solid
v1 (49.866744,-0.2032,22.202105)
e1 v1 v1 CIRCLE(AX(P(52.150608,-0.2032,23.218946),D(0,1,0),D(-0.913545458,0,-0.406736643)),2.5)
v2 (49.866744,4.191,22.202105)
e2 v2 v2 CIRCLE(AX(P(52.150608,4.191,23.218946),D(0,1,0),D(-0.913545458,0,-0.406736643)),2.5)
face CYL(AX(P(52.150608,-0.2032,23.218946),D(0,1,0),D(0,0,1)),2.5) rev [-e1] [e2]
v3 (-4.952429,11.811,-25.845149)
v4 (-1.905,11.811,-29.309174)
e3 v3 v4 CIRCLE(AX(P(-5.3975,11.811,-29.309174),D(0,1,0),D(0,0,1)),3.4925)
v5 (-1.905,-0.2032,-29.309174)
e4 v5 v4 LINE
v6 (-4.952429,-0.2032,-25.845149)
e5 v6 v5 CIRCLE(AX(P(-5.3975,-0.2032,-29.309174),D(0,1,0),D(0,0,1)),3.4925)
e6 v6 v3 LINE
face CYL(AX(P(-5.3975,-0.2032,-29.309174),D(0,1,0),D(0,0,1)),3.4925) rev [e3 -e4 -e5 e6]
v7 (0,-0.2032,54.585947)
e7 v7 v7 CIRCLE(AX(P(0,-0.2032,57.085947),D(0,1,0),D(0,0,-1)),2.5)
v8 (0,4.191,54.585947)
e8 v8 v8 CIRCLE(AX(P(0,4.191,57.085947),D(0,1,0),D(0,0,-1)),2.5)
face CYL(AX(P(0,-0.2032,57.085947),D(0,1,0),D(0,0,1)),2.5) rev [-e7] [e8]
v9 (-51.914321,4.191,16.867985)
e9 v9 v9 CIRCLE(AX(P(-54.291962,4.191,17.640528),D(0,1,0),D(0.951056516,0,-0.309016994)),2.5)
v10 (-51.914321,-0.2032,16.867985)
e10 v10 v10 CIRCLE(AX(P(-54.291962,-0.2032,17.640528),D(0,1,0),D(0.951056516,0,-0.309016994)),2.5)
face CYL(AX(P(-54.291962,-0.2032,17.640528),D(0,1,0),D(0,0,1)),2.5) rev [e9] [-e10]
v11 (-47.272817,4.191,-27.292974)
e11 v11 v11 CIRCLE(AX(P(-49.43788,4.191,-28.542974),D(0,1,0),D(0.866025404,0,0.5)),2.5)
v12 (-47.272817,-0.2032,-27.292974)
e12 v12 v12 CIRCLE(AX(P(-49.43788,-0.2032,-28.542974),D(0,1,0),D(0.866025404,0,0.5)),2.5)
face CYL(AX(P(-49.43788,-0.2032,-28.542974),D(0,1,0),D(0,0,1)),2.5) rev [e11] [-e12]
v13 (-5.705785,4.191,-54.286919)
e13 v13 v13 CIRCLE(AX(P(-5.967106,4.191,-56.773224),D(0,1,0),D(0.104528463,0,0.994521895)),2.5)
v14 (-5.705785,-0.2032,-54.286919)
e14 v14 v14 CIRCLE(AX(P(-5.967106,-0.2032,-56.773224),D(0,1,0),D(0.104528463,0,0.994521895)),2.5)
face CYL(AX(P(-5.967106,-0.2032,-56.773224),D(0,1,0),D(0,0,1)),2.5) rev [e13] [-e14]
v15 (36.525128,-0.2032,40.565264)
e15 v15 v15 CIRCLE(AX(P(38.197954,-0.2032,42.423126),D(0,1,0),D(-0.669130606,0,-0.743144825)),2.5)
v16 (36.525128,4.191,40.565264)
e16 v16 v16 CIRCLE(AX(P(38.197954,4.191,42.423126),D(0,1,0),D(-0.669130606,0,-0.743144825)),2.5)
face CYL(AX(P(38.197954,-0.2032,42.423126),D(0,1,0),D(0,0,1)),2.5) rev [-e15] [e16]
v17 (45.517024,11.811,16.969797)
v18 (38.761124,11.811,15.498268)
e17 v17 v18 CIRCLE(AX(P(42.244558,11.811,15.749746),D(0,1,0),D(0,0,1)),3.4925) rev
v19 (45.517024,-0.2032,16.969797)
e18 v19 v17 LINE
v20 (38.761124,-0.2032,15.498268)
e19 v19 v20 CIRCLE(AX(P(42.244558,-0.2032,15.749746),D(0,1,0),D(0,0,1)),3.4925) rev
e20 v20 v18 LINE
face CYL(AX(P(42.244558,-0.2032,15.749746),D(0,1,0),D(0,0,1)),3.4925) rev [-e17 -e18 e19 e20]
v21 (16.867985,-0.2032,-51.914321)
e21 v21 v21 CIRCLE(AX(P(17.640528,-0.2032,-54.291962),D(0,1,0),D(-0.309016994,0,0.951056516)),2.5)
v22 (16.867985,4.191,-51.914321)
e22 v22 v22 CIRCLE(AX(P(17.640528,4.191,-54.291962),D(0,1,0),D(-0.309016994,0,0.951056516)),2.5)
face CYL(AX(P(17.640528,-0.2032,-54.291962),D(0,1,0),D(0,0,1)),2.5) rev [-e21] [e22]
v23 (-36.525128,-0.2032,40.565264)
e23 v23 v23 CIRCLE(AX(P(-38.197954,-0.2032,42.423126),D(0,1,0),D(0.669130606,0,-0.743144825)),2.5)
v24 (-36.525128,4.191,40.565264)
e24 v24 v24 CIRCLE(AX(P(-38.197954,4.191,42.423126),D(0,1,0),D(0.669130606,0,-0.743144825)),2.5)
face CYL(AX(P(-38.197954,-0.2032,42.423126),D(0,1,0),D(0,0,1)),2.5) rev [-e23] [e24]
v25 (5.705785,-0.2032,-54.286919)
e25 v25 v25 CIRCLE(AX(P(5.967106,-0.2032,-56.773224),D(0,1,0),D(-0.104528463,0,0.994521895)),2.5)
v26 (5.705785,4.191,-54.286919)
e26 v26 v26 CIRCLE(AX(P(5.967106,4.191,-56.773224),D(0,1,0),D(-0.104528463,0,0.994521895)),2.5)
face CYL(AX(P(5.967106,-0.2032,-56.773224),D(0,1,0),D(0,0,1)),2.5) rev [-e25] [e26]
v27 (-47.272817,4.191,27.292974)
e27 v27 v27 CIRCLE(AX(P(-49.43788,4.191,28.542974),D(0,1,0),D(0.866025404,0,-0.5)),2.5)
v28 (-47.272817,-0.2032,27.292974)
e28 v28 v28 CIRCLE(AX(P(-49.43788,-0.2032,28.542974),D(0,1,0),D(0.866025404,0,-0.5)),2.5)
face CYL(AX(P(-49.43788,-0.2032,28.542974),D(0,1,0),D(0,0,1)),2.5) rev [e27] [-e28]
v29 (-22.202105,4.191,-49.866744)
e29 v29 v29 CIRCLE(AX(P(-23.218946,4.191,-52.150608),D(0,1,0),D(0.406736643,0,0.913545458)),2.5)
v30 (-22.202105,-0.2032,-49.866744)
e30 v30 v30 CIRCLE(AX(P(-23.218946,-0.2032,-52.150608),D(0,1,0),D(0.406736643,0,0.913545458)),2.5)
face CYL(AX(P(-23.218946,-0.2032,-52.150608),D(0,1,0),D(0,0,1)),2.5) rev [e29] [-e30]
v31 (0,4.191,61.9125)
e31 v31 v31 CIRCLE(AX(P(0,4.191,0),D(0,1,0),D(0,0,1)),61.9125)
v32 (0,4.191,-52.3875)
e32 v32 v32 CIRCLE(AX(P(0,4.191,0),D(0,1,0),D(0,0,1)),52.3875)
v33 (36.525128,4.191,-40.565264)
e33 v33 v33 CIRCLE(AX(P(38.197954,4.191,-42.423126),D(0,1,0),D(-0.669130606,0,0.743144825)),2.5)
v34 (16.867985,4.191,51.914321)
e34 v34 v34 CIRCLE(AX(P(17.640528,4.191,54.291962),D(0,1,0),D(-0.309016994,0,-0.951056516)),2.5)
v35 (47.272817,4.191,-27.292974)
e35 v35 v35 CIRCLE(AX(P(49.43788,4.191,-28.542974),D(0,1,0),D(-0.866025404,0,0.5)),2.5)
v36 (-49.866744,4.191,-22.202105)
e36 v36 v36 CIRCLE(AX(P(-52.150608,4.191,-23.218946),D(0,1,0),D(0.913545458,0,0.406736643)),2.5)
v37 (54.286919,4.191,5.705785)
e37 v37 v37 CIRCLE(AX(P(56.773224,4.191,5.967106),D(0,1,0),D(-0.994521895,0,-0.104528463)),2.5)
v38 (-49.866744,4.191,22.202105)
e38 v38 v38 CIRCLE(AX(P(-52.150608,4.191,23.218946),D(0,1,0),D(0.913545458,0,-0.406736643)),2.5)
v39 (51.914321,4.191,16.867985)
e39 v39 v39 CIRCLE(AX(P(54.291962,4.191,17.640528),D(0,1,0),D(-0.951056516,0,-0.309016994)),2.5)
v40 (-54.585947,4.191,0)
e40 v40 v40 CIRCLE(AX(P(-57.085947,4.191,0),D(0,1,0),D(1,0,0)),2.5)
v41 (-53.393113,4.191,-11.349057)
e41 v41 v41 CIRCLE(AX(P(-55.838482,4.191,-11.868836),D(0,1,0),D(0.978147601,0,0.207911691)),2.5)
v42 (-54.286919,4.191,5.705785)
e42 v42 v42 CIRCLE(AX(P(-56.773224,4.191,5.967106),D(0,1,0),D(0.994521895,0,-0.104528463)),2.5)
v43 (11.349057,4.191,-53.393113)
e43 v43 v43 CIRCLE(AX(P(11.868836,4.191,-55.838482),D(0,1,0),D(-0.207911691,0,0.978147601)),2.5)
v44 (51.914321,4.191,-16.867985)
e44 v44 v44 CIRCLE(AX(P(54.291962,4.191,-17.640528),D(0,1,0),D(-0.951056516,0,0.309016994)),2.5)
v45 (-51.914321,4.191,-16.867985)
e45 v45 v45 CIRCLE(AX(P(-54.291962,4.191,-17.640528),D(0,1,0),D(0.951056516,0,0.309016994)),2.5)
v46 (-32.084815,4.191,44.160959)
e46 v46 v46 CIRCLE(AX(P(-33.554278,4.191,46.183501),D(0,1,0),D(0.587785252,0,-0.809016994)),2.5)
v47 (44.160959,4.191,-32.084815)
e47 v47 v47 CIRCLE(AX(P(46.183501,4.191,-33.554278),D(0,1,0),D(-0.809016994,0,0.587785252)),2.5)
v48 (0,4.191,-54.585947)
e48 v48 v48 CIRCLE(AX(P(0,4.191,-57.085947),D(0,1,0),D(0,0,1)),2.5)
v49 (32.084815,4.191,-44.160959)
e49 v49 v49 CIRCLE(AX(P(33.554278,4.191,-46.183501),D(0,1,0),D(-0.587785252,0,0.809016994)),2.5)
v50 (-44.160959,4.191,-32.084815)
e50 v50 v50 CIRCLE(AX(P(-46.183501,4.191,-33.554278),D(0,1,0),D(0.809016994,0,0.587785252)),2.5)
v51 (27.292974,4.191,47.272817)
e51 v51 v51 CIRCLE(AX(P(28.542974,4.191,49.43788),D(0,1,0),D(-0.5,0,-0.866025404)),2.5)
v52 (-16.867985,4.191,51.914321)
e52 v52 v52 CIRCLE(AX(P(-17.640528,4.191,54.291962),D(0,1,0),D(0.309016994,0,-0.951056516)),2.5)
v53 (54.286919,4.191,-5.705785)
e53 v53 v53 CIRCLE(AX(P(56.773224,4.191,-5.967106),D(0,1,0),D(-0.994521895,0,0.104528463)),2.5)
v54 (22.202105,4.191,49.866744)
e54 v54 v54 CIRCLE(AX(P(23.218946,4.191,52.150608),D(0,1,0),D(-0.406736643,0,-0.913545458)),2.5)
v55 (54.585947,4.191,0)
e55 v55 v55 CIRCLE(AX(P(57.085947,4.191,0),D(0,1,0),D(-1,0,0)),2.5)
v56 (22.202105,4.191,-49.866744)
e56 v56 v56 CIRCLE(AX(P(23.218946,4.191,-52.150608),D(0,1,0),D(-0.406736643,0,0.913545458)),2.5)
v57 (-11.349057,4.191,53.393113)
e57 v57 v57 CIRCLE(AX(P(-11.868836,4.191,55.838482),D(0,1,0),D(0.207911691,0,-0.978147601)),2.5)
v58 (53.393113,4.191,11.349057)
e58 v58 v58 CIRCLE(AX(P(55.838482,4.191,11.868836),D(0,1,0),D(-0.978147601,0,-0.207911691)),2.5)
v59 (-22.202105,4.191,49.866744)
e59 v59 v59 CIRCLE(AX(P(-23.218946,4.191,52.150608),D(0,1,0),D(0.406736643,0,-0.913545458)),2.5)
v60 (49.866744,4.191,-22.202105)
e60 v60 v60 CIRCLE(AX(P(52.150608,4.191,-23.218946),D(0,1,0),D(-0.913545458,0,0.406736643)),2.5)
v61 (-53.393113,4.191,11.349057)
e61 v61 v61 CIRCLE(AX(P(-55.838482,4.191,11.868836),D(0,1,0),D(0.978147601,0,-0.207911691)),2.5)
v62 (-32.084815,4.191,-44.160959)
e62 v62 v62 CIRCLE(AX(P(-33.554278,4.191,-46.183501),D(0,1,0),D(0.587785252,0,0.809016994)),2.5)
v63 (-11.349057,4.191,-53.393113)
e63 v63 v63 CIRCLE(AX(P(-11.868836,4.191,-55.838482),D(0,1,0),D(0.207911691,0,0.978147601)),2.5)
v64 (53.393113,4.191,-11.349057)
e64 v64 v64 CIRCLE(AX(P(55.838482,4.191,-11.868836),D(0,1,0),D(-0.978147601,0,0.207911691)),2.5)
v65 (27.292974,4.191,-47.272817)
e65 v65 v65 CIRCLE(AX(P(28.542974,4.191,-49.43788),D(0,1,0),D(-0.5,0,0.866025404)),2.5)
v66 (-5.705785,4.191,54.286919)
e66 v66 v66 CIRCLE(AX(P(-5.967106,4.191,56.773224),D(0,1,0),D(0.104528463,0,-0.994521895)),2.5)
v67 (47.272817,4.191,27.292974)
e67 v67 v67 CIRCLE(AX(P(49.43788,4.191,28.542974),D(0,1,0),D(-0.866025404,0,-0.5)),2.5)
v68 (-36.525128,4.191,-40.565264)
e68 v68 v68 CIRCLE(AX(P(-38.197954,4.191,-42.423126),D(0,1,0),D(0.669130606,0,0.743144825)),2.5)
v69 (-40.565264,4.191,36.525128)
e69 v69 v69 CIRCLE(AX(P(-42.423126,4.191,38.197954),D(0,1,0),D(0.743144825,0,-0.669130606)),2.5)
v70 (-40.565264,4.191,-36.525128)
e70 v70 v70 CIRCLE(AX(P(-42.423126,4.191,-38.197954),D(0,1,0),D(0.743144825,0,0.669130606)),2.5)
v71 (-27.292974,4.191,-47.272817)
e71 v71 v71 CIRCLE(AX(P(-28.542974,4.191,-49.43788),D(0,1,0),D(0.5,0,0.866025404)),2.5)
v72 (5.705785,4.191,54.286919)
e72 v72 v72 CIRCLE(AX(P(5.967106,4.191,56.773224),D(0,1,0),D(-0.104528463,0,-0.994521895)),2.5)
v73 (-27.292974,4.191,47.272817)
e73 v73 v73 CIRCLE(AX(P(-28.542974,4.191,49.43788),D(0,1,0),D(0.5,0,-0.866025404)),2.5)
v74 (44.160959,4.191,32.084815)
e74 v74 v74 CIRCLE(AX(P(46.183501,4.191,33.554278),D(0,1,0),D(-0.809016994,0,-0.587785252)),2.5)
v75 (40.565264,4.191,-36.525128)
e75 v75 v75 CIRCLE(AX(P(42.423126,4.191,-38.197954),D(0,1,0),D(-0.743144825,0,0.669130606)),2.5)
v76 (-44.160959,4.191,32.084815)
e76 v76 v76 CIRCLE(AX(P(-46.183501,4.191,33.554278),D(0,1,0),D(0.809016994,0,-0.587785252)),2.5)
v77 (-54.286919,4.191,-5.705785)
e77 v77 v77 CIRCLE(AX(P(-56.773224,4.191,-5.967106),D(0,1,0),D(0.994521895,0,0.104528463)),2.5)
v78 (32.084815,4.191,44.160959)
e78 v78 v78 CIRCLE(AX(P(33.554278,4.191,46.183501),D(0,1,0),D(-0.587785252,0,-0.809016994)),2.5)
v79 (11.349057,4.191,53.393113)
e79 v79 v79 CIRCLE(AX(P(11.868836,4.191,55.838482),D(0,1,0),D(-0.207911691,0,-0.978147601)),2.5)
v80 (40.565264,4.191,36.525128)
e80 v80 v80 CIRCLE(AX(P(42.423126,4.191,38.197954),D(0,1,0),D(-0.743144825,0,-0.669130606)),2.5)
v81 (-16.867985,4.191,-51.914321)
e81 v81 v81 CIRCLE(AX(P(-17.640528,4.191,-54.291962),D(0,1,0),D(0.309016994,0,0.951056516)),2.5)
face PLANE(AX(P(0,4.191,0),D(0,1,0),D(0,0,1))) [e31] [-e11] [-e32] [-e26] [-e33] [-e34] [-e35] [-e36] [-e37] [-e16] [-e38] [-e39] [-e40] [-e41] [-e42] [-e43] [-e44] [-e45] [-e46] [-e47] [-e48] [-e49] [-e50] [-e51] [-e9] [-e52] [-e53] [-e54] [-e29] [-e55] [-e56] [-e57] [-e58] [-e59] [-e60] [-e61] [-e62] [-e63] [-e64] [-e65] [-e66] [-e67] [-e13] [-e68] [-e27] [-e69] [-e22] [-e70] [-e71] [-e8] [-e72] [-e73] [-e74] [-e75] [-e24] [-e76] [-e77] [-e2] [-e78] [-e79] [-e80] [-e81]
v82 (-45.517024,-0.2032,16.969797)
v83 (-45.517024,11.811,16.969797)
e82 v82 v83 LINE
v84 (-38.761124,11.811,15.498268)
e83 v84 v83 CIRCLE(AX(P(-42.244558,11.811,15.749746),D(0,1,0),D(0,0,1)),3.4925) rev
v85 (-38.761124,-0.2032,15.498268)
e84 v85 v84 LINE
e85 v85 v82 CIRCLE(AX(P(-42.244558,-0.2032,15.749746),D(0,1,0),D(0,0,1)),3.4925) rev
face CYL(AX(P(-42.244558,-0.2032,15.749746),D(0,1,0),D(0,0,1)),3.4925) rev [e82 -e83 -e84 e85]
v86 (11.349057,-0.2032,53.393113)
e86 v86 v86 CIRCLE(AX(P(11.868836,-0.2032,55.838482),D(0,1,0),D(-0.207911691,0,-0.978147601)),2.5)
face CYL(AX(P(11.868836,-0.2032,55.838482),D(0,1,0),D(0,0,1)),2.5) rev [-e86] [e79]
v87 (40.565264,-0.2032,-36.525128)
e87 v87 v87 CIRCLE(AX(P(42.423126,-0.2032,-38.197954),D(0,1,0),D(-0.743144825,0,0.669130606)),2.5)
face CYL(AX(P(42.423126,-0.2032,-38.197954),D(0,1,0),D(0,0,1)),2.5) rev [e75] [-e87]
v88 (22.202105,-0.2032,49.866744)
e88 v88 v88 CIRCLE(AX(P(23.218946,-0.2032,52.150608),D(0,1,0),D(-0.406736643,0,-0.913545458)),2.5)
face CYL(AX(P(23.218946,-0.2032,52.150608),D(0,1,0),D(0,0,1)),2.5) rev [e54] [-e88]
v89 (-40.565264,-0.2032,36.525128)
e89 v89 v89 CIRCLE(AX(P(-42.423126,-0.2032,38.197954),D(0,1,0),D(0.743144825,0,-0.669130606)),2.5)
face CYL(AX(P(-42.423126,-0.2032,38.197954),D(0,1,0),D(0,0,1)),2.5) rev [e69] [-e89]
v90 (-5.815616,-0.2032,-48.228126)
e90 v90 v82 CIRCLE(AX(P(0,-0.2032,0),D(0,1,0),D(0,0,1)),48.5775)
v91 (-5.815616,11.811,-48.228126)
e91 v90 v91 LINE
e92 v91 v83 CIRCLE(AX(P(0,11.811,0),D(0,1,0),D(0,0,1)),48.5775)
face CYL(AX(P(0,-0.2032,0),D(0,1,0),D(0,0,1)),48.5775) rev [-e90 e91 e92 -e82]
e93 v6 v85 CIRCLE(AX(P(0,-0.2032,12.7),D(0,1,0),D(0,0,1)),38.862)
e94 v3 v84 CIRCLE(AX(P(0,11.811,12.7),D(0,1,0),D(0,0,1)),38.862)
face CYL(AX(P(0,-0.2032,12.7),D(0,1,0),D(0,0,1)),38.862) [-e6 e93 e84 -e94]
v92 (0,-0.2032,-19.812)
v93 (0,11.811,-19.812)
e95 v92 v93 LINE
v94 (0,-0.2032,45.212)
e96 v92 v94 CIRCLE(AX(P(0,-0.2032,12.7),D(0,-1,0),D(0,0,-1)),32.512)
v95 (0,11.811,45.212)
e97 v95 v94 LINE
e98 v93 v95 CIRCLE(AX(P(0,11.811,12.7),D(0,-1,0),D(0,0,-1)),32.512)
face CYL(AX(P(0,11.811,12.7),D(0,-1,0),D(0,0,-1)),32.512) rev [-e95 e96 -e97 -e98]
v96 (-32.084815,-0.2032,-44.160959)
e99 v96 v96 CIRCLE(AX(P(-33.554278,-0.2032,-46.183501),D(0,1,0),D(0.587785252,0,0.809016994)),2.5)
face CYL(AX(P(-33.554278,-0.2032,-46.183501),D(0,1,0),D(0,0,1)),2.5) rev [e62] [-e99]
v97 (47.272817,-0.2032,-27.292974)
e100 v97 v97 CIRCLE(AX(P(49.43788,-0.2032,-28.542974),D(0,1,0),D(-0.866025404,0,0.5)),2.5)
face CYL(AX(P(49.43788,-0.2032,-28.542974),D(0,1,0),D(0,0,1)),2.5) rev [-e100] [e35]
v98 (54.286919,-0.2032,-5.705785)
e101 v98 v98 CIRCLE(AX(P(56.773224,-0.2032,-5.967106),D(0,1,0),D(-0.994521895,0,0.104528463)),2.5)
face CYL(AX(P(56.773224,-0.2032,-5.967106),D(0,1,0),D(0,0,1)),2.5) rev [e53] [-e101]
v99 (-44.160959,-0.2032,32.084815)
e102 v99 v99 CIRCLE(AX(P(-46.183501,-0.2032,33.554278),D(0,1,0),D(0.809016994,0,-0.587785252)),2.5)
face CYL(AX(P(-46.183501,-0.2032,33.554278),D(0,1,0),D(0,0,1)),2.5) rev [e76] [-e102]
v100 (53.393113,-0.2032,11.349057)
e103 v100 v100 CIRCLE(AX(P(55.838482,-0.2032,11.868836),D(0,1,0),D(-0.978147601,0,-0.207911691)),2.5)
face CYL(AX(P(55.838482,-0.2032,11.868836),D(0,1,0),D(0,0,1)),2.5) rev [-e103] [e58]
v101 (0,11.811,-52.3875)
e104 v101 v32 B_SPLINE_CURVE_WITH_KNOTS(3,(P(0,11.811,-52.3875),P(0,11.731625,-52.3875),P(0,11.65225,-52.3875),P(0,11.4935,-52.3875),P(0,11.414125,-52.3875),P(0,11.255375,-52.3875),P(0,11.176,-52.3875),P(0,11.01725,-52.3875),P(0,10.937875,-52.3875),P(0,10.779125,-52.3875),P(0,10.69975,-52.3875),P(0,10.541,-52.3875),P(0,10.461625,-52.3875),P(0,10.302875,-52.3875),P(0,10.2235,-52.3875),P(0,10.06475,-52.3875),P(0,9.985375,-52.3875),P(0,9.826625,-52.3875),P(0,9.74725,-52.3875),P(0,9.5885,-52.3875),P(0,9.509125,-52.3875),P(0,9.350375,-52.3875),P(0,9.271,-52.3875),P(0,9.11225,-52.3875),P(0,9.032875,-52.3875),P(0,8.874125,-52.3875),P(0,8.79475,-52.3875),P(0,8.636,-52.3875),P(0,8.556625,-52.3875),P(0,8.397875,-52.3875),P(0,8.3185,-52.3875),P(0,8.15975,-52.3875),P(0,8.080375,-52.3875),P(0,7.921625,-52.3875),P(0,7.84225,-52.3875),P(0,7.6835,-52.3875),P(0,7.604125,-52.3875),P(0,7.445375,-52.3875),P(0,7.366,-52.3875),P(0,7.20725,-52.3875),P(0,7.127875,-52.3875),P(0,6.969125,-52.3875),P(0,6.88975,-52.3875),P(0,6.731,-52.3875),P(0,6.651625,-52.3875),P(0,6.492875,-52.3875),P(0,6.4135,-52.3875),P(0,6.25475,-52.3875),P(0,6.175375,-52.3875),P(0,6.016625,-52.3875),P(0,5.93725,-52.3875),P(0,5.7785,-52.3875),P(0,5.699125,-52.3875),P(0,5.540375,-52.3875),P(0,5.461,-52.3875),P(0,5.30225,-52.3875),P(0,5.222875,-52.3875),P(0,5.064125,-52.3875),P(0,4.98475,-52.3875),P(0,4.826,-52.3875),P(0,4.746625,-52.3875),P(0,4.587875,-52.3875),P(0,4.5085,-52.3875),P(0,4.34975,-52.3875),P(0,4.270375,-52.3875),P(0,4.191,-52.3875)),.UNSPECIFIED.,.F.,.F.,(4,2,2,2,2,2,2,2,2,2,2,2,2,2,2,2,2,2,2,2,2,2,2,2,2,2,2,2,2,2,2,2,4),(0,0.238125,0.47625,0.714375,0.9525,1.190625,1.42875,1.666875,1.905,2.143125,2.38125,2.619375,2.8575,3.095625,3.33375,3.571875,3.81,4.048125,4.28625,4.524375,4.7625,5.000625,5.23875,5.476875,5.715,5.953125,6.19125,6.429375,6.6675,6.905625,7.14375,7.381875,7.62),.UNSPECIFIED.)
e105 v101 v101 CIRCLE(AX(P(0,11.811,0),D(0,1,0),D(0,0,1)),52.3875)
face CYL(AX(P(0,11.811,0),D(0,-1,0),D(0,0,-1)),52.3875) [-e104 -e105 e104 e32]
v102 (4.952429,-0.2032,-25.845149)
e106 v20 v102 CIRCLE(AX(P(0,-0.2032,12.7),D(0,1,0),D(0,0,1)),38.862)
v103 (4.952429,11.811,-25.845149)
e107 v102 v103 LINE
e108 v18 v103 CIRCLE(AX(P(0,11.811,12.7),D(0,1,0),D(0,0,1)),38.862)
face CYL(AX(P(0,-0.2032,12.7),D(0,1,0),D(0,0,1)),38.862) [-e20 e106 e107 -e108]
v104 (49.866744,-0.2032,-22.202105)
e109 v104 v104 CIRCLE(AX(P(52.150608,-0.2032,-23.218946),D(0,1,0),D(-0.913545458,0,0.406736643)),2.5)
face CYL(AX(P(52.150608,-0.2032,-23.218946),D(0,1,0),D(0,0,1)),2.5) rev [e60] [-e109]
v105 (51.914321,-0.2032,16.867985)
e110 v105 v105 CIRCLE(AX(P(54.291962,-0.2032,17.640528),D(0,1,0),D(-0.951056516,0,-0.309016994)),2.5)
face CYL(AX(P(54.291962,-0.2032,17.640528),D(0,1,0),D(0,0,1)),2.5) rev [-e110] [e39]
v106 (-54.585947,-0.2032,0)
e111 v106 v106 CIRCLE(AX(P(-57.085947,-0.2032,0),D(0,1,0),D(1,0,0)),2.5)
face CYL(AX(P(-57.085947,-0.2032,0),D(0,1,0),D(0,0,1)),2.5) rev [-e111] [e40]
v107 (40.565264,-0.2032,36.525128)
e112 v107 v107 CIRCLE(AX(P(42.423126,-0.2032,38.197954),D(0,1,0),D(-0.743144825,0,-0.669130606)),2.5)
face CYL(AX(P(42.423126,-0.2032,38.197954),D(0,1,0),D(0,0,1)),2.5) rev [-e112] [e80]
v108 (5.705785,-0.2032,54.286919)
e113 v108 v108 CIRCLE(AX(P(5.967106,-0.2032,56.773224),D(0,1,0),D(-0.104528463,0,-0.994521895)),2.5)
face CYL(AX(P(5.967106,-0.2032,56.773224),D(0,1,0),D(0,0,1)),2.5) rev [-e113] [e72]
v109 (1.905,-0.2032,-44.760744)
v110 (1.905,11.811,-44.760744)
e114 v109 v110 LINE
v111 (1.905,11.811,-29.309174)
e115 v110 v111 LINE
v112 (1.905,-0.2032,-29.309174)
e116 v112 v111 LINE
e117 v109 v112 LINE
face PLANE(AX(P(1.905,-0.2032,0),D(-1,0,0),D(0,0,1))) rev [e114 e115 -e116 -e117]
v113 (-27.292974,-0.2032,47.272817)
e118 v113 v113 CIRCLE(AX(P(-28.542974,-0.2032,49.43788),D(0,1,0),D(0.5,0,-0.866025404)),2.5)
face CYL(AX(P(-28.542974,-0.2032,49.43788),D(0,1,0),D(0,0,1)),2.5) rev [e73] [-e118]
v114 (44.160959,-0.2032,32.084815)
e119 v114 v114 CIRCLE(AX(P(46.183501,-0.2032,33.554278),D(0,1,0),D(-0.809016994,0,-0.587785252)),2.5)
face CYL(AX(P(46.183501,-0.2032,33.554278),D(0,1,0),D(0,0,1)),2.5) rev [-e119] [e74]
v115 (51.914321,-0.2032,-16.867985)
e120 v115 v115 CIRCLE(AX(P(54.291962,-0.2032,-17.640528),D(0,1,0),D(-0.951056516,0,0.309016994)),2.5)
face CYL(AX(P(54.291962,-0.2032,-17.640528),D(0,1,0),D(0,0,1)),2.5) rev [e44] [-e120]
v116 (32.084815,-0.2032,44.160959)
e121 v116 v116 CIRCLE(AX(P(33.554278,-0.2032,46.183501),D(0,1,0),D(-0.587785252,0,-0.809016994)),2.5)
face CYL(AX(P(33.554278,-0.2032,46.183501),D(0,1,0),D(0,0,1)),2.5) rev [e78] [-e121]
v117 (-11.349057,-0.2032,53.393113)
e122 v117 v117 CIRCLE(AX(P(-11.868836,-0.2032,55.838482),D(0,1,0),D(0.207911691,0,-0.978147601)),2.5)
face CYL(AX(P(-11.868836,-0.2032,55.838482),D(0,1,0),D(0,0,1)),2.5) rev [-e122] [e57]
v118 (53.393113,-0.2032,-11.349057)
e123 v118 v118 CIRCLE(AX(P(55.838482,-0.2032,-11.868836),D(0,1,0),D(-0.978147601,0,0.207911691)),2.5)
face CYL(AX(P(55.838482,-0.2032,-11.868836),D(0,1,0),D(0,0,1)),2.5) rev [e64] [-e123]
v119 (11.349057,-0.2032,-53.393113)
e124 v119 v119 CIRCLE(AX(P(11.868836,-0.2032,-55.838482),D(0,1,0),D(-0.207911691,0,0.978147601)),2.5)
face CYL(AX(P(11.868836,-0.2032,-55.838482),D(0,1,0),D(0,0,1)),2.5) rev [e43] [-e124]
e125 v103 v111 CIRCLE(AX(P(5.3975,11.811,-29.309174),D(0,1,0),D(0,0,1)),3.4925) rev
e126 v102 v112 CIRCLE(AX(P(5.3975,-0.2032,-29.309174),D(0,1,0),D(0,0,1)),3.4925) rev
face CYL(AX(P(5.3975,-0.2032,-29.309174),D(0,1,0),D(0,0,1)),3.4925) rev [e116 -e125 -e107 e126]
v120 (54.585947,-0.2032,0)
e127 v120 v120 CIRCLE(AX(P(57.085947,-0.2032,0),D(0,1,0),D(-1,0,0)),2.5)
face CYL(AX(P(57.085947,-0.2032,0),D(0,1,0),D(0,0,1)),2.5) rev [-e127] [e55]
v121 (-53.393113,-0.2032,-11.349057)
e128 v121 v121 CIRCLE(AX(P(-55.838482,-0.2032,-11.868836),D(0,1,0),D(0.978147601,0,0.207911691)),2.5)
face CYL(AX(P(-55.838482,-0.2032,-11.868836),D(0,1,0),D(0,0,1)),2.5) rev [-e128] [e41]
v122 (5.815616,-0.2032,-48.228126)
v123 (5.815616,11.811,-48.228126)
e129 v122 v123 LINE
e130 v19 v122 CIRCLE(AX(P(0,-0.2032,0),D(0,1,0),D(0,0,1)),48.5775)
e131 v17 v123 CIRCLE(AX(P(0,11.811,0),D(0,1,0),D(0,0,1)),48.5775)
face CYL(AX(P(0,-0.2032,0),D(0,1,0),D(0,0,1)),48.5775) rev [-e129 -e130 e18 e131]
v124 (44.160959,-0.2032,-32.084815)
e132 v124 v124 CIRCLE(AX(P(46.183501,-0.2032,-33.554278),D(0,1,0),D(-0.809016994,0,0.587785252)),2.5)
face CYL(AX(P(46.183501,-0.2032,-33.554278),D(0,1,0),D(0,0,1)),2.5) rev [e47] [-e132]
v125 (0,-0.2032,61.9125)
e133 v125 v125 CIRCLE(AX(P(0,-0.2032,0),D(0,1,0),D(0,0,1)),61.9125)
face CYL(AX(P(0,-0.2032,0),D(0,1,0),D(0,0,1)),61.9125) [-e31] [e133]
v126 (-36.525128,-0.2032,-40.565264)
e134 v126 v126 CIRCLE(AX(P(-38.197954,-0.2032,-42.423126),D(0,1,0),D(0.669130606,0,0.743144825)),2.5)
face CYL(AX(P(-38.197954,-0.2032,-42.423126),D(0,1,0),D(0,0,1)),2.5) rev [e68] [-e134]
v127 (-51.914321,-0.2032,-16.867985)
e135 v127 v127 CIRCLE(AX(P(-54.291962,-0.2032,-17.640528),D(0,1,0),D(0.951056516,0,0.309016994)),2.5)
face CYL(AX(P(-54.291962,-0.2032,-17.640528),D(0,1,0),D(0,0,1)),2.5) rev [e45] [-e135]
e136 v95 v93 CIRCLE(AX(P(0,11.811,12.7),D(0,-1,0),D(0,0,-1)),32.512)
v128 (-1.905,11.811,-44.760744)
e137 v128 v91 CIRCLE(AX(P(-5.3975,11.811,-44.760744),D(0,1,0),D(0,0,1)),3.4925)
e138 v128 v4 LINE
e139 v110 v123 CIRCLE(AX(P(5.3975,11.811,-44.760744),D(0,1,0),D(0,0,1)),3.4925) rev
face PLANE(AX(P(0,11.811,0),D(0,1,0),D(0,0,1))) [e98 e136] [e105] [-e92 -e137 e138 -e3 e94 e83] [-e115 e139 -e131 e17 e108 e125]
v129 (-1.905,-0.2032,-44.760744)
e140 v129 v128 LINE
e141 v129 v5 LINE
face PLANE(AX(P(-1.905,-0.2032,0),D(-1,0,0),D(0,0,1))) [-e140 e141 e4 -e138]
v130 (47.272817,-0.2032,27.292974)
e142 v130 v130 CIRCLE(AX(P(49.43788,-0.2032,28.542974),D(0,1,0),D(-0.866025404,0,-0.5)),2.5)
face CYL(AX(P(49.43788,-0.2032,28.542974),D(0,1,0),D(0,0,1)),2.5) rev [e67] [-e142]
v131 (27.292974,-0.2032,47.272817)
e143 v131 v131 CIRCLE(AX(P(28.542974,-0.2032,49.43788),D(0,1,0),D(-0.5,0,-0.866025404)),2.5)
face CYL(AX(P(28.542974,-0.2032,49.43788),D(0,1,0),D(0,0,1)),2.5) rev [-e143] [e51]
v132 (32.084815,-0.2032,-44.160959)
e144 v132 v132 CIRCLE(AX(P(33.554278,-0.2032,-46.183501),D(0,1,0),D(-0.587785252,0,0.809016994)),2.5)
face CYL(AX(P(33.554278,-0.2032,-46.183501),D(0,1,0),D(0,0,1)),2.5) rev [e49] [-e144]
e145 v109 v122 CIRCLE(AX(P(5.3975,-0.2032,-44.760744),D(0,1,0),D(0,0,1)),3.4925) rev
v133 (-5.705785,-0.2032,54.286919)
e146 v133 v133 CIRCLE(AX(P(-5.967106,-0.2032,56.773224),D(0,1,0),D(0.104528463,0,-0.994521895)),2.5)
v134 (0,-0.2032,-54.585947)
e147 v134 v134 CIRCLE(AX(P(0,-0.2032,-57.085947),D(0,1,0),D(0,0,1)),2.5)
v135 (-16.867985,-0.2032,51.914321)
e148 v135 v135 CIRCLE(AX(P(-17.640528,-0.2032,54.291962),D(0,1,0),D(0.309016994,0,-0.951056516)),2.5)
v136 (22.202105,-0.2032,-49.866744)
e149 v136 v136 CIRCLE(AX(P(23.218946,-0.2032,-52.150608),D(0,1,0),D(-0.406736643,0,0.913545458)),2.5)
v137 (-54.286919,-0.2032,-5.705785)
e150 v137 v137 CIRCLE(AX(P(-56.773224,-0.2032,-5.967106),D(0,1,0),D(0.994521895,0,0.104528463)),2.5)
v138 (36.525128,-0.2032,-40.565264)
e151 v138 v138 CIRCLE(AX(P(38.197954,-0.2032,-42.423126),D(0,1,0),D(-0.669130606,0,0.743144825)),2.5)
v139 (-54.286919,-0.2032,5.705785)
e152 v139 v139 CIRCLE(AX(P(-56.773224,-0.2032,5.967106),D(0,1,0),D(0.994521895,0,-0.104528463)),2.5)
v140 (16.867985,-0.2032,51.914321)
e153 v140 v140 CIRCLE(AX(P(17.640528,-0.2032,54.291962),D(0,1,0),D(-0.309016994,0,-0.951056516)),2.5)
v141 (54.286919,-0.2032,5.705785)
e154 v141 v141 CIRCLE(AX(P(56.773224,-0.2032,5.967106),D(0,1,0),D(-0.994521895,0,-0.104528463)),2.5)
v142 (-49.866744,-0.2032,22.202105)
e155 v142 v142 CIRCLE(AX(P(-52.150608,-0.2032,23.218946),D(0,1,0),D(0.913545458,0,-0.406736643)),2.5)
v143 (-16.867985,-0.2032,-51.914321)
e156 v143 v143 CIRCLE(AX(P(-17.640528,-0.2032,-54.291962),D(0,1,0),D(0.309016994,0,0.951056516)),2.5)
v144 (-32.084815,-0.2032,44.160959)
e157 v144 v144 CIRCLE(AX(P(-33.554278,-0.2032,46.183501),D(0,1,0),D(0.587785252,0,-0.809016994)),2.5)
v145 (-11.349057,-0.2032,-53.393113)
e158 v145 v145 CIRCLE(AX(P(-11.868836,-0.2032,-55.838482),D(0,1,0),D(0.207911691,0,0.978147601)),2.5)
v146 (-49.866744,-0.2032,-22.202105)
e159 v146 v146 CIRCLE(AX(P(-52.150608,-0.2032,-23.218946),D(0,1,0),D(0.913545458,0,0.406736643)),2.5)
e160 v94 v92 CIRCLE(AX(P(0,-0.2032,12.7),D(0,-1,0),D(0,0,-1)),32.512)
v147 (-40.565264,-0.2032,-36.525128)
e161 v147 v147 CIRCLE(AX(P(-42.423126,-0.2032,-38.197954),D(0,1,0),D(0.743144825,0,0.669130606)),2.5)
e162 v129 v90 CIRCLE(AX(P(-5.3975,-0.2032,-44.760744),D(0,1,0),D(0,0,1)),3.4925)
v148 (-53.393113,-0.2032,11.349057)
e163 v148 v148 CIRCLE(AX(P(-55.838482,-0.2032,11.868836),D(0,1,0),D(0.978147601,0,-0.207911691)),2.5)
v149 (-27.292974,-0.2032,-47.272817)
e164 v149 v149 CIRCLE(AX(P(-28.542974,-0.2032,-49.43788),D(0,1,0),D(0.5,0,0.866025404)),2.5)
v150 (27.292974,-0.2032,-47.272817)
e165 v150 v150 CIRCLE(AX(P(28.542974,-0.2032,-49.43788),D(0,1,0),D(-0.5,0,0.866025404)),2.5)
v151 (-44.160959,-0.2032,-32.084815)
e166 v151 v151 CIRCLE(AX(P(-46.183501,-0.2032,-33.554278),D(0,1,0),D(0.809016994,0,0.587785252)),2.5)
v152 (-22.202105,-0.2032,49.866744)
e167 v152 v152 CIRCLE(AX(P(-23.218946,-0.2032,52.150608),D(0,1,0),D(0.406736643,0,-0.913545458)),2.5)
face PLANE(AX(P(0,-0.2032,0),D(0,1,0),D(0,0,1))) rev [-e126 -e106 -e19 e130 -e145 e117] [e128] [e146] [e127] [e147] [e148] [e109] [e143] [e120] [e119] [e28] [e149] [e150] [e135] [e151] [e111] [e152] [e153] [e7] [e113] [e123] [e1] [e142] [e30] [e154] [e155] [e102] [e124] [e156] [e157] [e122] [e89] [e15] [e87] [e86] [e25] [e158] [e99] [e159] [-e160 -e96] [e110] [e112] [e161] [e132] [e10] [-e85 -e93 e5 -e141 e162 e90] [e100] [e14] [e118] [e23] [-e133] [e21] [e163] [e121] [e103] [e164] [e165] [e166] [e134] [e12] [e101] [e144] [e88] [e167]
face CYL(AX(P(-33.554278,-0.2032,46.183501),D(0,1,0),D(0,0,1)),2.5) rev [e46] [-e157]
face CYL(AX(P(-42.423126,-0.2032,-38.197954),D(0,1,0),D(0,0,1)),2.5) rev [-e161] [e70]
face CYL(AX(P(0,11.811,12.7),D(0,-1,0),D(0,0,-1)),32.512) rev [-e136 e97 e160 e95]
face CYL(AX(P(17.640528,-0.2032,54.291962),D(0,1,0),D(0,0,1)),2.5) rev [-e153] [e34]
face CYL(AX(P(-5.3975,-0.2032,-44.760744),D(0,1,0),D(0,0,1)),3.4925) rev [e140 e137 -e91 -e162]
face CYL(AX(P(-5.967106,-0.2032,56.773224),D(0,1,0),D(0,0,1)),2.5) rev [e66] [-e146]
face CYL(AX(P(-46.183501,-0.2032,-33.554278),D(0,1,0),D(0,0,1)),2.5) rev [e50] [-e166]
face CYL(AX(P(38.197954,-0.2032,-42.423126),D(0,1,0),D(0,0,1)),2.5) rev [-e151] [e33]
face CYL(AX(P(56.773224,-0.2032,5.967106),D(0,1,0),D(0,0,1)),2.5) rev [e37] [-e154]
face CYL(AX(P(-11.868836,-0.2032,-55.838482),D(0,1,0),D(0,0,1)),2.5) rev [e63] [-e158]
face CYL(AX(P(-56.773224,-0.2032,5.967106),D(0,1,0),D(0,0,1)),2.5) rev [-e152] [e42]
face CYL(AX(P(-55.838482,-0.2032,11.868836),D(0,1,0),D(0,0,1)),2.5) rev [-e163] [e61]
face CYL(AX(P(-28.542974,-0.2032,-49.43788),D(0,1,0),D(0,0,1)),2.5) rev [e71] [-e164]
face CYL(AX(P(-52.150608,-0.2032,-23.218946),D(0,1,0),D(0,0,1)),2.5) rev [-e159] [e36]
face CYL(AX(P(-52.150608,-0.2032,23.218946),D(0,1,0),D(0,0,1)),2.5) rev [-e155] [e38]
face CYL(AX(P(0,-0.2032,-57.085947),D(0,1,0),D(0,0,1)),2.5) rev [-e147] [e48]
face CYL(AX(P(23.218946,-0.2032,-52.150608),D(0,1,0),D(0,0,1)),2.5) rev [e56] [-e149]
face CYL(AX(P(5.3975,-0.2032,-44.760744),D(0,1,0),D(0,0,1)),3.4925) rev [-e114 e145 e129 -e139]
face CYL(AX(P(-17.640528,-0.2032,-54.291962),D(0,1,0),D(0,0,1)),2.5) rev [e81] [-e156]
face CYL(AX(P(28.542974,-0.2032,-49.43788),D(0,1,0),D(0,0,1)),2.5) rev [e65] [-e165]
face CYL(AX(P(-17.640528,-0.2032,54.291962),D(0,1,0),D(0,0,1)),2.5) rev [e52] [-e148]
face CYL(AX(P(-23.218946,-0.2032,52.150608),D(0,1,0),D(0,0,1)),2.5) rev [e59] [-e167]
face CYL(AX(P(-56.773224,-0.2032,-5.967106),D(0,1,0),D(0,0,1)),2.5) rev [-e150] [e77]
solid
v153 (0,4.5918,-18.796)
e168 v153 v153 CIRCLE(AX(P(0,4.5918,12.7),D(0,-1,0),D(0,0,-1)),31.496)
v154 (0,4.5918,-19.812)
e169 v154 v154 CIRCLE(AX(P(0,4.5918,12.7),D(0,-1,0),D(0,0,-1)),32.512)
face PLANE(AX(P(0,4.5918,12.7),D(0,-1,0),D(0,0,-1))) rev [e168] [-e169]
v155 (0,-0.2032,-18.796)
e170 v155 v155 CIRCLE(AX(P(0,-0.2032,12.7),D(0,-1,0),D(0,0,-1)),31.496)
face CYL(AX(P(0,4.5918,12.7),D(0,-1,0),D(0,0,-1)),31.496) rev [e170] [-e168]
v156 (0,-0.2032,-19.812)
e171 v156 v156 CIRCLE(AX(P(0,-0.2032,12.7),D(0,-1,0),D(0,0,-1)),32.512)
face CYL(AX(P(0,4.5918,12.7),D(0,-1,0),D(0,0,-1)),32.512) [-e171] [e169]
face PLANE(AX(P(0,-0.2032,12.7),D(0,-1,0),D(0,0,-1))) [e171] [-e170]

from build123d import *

# Parameters (mm, degrees)
SLOTTED_BODY_EXTRUDE_DEPTH      = 4.191
SLOTTED_BODY_EXTRUDE_DEPTH_BACK = 0.2032
SKETCH1_R                       = 64.4525
SKETCH1_R_2                     = 30.988
SKETCH5_R                       = 52.3875
BOSS_EXTRUDE3_DEPTH             = 7.62
SKETCH6_R                       = 32.512
CUT_EXTRUDE5_DEPTH              = 92.937971014
SKETCH8_R                       = 32.512
SKETCH8_R_2                     = 31.496
BOSS_EXTRUDE4_DEPTH             = 4.795000062
CUT_EXTRUDE6_DEPTH              = 92.937971014
MOVE_START                      = -0.2032
MOVE_FACE1_OUTLINE_R            = 64.4525
MOVE_FACE1_OUTLINE_R_2          = 61.9125
MOVE_FACE1_DEPTH                = 4.3942
SKETCH18_R                      = 2.5
CUT_EXTRUDE7_DEPTH              = 88.888450393
CIRPATTERN1_COUNT               = 60


# Read off the part's stored shape, not the designer's step: Move Face1
with BuildPart() as part:
    # Sketch1 → Slotted-Body Extrude (new, two sides: drawn at the far end of the back side and taken through both)
    with BuildSketch(Plane(origin=(0, 0, 0), x_dir=(1, 0, 0), z_dir=(0, 1, 0)).offset(-SLOTTED_BODY_EXTRUDE_DEPTH_BACK)):
        with Locations(Location((0, 0, 0), (0, 0, 270))):
            Circle(SKETCH1_R)
        with Locations(Location((0, -12.7, 0), (0, 0, 270))):
            Circle(SKETCH1_R_2, mode=Mode.SUBTRACT)
    extrude(amount=SLOTTED_BODY_EXTRUDE_DEPTH + SLOTTED_BODY_EXTRUDE_DEPTH_BACK)

    # Sketch5 → Boss-Extrude3 (add)
    with BuildSketch(Plane(origin=(0, 4.191, 0), x_dir=(1, 0, 0), z_dir=(0, 1, 0))):
        with Locations(Location((0, 0, 0), (0, 0, 90))):
            Circle(SKETCH5_R)
    extrude(amount=BOSS_EXTRUDE3_DEPTH)

    # Sketch6 → Cut-Extrude5 (cut, through all)
    with BuildSketch(Plane.XZ.offset(0.2032)):
        with Locations(Location((0, 12.7, 0), (0, 0, 270))):
            Circle(SKETCH6_R)
    extrude(amount=-CUT_EXTRUDE5_DEPTH, mode=Mode.SUBTRACT)

    # Sketch16 → Cut-Extrude6 (cut, through all)
    with BuildSketch(Plane(origin=(0, 11.811, 0), x_dir=(1, 0, 0), z_dir=(0, 1, 0))):
        with BuildLine():
            Line((1.905, 44.760744171), (1.905, 29.30917357))
            ThreePointArc((1.905, 29.30917357), (2.775290296, 27.00232019), (4.952428786, 25.845148763))
            ThreePointArc((4.952428786, 25.845148763), (30.083852846, 11.901155297), (38.761124089, -15.498267924))
            ThreePointArc((38.761124089, -15.498267924), (41.501270881, -19.162235056), (45.517024238, -16.969797016))
            ThreePointArc((45.517024238, -16.969797016), (41.490387768, 25.265019871), (5.815616197, 48.228125762))
            ThreePointArc((5.815616197, 48.228125762), (3.080466829, 47.37396317), (1.905, 44.760744171))
        make_face()
        with BuildLine():
            Line((-1.905, 44.760744171), (-1.905, 29.30917357))
            ThreePointArc((-1.905, 29.30917357), (-2.775290296, 27.00232019), (-4.952428786, 25.845148763))
            ThreePointArc((-4.952428786, 25.845148763), (-30.083852846, 11.901155297), (-38.761124089, -15.498267924))
            ThreePointArc((-38.761124089, -15.498267924), (-41.501270881, -19.162235056), (-45.517024238, -16.969797016))
            ThreePointArc((-45.517024238, -16.969797016), (-41.490387768, 25.265019871), (-5.815616197, 48.228125762))
            ThreePointArc((-5.815616197, 48.228125762), (-3.080466829, 47.37396317), (-1.905, 44.760744171))
        make_face()
    extrude(amount=-CUT_EXTRUDE6_DEPTH, mode=Mode.SUBTRACT)

    # Move Face1 outline → Move Face1 (cut)
    with BuildSketch(Plane(origin=(0, 0, 0), x_dir=(1, 0, 0), z_dir=(0, 1, 0)).offset(MOVE_START)):
        Circle(MOVE_FACE1_OUTLINE_R)
        Circle(MOVE_FACE1_OUTLINE_R_2, mode=Mode.SUBTRACT)
    extrude(amount=MOVE_FACE1_DEPTH, mode=Mode.SUBTRACT)

    # Sketch18 → Cut-Extrude7 (cut, through all)
    with BuildSketch(Plane(origin=(0, 4.191, 0), x_dir=(1, 0, 0), z_dir=(0, 1, 0))):
        with Locations(Location((0, 57.085947013, 0), (0, 0, 270))):
            Circle(SKETCH18_R)
    cut_extrude7 = extrude(amount=-CUT_EXTRUDE7_DEPTH, mode=Mode.SUBTRACT)

    # CirPattern1: Cut-Extrude7 ×60 about axis
    cirpattern1_axis = Axis((0, 0, 0), (0, 1, 0))
    for i in range(1, CIRPATTERN1_COUNT):
        add(cut_extrude7.rotate(cirpattern1_axis, i * 360 / CIRPATTERN1_COUNT), mode=Mode.SUBTRACT)


with BuildPart() as body_2:
    # Sketch8 → Boss-Extrude4 (new body)
    with BuildSketch(Plane.XZ.offset(0.2032)):
        with Locations(Location((0, 12.7, 0), (0, 0, 270))):
            Circle(SKETCH8_R)
        with Locations(Location((0, 12.7, 0), (0, 0, 270))):
            Circle(SKETCH8_R_2, mode=Mode.SUBTRACT)
    extrude(amount=-BOSS_EXTRUDE4_DEPTH)


solid = Compound([part.part, body_2.part])
